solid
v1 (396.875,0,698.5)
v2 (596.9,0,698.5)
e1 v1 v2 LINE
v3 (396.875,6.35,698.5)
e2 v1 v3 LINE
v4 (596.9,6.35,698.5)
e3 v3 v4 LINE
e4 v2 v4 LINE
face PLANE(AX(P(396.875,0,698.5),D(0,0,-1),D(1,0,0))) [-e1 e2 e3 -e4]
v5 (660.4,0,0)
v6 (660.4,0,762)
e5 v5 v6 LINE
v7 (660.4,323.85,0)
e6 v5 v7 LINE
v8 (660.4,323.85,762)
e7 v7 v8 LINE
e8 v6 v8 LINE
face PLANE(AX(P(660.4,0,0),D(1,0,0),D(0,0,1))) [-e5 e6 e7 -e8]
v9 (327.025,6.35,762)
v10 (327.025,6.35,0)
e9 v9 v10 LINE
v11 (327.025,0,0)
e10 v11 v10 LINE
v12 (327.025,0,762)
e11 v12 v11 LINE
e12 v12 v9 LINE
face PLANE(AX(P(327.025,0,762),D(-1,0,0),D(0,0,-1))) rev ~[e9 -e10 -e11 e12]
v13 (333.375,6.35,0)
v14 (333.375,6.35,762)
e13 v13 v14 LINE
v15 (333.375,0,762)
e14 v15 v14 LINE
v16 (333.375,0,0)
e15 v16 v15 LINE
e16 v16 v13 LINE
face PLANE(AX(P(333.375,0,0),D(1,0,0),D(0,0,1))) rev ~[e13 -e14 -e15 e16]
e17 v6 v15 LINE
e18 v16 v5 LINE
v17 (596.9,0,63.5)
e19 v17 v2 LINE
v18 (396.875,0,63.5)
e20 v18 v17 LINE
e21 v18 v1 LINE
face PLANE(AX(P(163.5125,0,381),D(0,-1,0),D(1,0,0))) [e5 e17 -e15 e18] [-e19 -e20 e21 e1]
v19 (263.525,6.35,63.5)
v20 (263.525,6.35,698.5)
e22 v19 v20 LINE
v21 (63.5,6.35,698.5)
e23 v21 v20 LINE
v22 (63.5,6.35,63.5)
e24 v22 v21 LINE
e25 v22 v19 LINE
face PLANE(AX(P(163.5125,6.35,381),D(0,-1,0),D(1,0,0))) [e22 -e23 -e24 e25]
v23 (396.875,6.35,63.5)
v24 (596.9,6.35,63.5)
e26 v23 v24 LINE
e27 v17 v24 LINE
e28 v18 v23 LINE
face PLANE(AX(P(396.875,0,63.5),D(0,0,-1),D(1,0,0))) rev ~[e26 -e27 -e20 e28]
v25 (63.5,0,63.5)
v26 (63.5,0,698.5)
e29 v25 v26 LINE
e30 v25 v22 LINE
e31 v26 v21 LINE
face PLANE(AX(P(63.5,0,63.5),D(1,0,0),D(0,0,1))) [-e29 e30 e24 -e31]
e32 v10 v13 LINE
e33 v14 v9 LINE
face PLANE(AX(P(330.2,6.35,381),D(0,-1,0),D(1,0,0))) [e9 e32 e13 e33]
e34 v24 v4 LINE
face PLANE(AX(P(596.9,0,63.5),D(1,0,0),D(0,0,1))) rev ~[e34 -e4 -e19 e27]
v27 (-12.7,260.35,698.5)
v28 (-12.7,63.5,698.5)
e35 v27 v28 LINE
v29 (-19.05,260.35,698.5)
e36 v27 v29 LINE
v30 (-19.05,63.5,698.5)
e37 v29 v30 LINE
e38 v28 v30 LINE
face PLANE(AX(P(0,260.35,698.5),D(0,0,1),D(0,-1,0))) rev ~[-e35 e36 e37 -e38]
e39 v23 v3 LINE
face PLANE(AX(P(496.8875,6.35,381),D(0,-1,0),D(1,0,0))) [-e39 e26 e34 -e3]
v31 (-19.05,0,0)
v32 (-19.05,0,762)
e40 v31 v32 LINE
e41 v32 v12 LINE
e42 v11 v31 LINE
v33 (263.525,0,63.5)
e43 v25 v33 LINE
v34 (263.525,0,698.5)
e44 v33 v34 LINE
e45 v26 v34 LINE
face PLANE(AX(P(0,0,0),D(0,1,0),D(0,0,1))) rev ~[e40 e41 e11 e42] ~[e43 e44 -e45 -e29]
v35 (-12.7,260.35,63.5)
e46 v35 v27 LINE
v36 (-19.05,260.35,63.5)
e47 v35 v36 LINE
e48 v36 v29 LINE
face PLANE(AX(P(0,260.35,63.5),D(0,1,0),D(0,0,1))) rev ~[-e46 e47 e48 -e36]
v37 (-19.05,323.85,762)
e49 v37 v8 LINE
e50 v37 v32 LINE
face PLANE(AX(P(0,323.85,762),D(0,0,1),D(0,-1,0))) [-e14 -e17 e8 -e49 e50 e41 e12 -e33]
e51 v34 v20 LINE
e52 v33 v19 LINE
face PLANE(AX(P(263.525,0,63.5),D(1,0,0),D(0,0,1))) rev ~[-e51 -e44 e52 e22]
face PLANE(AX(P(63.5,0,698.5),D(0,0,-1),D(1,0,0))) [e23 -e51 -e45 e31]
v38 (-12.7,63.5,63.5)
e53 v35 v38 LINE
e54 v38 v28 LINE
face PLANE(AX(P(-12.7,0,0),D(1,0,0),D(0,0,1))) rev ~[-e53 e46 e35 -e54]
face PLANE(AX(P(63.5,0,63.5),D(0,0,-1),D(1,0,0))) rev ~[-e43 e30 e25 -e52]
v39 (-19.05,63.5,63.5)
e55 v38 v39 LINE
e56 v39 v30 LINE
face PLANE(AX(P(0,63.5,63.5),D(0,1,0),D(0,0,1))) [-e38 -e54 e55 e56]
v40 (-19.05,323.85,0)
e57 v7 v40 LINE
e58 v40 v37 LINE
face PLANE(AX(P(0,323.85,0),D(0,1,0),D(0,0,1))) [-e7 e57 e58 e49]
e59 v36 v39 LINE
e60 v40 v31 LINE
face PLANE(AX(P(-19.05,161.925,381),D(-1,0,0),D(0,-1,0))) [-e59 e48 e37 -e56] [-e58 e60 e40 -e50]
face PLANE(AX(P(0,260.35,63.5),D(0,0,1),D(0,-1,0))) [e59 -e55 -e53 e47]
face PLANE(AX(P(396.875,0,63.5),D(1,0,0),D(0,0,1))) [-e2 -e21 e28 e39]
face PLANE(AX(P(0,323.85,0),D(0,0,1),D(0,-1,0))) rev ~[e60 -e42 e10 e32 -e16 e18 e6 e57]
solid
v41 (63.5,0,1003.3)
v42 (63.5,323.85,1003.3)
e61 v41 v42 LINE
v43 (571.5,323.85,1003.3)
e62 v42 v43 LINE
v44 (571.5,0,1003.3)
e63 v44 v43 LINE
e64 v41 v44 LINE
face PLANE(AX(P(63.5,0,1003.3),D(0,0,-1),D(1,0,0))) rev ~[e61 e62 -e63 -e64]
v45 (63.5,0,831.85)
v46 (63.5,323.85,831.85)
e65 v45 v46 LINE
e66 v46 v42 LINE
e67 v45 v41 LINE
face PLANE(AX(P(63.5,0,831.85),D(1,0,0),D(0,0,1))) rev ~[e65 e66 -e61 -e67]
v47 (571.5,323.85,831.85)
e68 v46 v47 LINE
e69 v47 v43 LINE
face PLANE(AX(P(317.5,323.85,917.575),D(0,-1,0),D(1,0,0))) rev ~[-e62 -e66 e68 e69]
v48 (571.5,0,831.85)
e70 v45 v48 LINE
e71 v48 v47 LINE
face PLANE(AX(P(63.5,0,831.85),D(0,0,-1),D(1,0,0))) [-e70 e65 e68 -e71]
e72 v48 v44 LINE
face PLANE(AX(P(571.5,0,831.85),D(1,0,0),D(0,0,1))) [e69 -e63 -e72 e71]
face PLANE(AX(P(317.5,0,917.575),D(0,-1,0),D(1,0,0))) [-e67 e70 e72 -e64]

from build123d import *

# Parameters (mm, degrees)
F0_W     = 508
F0_H     = 171.45
F1_DEPTH = 323.85
F0_W_2   = 327.025
F0_H_2   = 762
F0_W_3   = 200.025
F0_H_3   = 635
F2_DEPTH = 6.35
F3_W     = 323.85
F3_H     = 762
F3_W_2   = 196.85
F3_H_2   = 635
F4_DEPTH = 19.05
F5_DEPTH = 12.7


# Not quite as in the source:
# - a feature names something its author has since deleted; it is built from what else it names


with BuildPart() as f1:
    # F0 (on Front) → F1 (new body)
    with BuildSketch(Plane.XZ):
        with Locations((317.5, 917.575)):
            Rectangle(F0_W, F0_H)
    extrude(amount=-F1_DEPTH)


with BuildPart() as f1b:
    # F0 (on Front) → F1, piece 2 (new body)
    with BuildSketch(Plane.XZ):
        with Locations((163.5125, 381)):
            Rectangle(F0_W_2, F0_H_2)
        with Locations((163.5125, 381)):
            Rectangle(F0_W_3, F0_H_3, mode=Mode.SUBTRACT)
        with Locations((496.8875, 381)):
            Rectangle(F0_W_2, F0_H_2)
        with Locations((496.8875, 381)):
            Rectangle(F0_W_3, F0_H_3, mode=Mode.SUBTRACT)
        with Locations((163.5125, 381)):
            Rectangle(F0_W_3, F0_H_3)
        with Locations((496.8875, 381)):
            Rectangle(F0_W_3, F0_H_3)
        Polygon((327.025, 762), (327.025, 0), (333.375, 0), (333.375, 762), (330.2, 762), align=None)
    extrude(amount=-F1_DEPTH)

    # F0 (on Front) → F2 (cut)
    with BuildSketch(Plane.XZ):
        Polygon((327.025, 762), (327.025, 0), (333.375, 0), (333.375, 762), (330.2, 762), align=None)
        with Locations((317.5, 917.575)):
            Rectangle(F0_W, F0_H)
        with Locations((496.8875, 381)):
            Rectangle(F0_W_3, F0_H_3)
        with Locations((163.5125, 381)):
            Rectangle(F0_W_3, F0_H_3)
    extrude(amount=-F2_DEPTH, mode=Mode.SUBTRACT)

    # F3 (on face) → F4 (join)
    with BuildSketch(Plane(origin=(0, 0, 0), x_dir=(0, -1, 0), z_dir=(-1, 0, 0))):
        with Locations((-161.925, 381)):
            Rectangle(F3_W, F3_H)
        with Locations((-161.925, 381)):
            Rectangle(F3_W_2, F3_H_2, mode=Mode.SUBTRACT)
    extrude(amount=F4_DEPTH)

    # F5 (add): a face of the model
    f5_faces = [f1b.faces().sort_by_distance(p)[0] for p in [
        (0, 161.925, 381),
    ]]
    extrude(f5_faces, amount=F5_DEPTH)


solid = Compound([f1.part, f1b.part])
